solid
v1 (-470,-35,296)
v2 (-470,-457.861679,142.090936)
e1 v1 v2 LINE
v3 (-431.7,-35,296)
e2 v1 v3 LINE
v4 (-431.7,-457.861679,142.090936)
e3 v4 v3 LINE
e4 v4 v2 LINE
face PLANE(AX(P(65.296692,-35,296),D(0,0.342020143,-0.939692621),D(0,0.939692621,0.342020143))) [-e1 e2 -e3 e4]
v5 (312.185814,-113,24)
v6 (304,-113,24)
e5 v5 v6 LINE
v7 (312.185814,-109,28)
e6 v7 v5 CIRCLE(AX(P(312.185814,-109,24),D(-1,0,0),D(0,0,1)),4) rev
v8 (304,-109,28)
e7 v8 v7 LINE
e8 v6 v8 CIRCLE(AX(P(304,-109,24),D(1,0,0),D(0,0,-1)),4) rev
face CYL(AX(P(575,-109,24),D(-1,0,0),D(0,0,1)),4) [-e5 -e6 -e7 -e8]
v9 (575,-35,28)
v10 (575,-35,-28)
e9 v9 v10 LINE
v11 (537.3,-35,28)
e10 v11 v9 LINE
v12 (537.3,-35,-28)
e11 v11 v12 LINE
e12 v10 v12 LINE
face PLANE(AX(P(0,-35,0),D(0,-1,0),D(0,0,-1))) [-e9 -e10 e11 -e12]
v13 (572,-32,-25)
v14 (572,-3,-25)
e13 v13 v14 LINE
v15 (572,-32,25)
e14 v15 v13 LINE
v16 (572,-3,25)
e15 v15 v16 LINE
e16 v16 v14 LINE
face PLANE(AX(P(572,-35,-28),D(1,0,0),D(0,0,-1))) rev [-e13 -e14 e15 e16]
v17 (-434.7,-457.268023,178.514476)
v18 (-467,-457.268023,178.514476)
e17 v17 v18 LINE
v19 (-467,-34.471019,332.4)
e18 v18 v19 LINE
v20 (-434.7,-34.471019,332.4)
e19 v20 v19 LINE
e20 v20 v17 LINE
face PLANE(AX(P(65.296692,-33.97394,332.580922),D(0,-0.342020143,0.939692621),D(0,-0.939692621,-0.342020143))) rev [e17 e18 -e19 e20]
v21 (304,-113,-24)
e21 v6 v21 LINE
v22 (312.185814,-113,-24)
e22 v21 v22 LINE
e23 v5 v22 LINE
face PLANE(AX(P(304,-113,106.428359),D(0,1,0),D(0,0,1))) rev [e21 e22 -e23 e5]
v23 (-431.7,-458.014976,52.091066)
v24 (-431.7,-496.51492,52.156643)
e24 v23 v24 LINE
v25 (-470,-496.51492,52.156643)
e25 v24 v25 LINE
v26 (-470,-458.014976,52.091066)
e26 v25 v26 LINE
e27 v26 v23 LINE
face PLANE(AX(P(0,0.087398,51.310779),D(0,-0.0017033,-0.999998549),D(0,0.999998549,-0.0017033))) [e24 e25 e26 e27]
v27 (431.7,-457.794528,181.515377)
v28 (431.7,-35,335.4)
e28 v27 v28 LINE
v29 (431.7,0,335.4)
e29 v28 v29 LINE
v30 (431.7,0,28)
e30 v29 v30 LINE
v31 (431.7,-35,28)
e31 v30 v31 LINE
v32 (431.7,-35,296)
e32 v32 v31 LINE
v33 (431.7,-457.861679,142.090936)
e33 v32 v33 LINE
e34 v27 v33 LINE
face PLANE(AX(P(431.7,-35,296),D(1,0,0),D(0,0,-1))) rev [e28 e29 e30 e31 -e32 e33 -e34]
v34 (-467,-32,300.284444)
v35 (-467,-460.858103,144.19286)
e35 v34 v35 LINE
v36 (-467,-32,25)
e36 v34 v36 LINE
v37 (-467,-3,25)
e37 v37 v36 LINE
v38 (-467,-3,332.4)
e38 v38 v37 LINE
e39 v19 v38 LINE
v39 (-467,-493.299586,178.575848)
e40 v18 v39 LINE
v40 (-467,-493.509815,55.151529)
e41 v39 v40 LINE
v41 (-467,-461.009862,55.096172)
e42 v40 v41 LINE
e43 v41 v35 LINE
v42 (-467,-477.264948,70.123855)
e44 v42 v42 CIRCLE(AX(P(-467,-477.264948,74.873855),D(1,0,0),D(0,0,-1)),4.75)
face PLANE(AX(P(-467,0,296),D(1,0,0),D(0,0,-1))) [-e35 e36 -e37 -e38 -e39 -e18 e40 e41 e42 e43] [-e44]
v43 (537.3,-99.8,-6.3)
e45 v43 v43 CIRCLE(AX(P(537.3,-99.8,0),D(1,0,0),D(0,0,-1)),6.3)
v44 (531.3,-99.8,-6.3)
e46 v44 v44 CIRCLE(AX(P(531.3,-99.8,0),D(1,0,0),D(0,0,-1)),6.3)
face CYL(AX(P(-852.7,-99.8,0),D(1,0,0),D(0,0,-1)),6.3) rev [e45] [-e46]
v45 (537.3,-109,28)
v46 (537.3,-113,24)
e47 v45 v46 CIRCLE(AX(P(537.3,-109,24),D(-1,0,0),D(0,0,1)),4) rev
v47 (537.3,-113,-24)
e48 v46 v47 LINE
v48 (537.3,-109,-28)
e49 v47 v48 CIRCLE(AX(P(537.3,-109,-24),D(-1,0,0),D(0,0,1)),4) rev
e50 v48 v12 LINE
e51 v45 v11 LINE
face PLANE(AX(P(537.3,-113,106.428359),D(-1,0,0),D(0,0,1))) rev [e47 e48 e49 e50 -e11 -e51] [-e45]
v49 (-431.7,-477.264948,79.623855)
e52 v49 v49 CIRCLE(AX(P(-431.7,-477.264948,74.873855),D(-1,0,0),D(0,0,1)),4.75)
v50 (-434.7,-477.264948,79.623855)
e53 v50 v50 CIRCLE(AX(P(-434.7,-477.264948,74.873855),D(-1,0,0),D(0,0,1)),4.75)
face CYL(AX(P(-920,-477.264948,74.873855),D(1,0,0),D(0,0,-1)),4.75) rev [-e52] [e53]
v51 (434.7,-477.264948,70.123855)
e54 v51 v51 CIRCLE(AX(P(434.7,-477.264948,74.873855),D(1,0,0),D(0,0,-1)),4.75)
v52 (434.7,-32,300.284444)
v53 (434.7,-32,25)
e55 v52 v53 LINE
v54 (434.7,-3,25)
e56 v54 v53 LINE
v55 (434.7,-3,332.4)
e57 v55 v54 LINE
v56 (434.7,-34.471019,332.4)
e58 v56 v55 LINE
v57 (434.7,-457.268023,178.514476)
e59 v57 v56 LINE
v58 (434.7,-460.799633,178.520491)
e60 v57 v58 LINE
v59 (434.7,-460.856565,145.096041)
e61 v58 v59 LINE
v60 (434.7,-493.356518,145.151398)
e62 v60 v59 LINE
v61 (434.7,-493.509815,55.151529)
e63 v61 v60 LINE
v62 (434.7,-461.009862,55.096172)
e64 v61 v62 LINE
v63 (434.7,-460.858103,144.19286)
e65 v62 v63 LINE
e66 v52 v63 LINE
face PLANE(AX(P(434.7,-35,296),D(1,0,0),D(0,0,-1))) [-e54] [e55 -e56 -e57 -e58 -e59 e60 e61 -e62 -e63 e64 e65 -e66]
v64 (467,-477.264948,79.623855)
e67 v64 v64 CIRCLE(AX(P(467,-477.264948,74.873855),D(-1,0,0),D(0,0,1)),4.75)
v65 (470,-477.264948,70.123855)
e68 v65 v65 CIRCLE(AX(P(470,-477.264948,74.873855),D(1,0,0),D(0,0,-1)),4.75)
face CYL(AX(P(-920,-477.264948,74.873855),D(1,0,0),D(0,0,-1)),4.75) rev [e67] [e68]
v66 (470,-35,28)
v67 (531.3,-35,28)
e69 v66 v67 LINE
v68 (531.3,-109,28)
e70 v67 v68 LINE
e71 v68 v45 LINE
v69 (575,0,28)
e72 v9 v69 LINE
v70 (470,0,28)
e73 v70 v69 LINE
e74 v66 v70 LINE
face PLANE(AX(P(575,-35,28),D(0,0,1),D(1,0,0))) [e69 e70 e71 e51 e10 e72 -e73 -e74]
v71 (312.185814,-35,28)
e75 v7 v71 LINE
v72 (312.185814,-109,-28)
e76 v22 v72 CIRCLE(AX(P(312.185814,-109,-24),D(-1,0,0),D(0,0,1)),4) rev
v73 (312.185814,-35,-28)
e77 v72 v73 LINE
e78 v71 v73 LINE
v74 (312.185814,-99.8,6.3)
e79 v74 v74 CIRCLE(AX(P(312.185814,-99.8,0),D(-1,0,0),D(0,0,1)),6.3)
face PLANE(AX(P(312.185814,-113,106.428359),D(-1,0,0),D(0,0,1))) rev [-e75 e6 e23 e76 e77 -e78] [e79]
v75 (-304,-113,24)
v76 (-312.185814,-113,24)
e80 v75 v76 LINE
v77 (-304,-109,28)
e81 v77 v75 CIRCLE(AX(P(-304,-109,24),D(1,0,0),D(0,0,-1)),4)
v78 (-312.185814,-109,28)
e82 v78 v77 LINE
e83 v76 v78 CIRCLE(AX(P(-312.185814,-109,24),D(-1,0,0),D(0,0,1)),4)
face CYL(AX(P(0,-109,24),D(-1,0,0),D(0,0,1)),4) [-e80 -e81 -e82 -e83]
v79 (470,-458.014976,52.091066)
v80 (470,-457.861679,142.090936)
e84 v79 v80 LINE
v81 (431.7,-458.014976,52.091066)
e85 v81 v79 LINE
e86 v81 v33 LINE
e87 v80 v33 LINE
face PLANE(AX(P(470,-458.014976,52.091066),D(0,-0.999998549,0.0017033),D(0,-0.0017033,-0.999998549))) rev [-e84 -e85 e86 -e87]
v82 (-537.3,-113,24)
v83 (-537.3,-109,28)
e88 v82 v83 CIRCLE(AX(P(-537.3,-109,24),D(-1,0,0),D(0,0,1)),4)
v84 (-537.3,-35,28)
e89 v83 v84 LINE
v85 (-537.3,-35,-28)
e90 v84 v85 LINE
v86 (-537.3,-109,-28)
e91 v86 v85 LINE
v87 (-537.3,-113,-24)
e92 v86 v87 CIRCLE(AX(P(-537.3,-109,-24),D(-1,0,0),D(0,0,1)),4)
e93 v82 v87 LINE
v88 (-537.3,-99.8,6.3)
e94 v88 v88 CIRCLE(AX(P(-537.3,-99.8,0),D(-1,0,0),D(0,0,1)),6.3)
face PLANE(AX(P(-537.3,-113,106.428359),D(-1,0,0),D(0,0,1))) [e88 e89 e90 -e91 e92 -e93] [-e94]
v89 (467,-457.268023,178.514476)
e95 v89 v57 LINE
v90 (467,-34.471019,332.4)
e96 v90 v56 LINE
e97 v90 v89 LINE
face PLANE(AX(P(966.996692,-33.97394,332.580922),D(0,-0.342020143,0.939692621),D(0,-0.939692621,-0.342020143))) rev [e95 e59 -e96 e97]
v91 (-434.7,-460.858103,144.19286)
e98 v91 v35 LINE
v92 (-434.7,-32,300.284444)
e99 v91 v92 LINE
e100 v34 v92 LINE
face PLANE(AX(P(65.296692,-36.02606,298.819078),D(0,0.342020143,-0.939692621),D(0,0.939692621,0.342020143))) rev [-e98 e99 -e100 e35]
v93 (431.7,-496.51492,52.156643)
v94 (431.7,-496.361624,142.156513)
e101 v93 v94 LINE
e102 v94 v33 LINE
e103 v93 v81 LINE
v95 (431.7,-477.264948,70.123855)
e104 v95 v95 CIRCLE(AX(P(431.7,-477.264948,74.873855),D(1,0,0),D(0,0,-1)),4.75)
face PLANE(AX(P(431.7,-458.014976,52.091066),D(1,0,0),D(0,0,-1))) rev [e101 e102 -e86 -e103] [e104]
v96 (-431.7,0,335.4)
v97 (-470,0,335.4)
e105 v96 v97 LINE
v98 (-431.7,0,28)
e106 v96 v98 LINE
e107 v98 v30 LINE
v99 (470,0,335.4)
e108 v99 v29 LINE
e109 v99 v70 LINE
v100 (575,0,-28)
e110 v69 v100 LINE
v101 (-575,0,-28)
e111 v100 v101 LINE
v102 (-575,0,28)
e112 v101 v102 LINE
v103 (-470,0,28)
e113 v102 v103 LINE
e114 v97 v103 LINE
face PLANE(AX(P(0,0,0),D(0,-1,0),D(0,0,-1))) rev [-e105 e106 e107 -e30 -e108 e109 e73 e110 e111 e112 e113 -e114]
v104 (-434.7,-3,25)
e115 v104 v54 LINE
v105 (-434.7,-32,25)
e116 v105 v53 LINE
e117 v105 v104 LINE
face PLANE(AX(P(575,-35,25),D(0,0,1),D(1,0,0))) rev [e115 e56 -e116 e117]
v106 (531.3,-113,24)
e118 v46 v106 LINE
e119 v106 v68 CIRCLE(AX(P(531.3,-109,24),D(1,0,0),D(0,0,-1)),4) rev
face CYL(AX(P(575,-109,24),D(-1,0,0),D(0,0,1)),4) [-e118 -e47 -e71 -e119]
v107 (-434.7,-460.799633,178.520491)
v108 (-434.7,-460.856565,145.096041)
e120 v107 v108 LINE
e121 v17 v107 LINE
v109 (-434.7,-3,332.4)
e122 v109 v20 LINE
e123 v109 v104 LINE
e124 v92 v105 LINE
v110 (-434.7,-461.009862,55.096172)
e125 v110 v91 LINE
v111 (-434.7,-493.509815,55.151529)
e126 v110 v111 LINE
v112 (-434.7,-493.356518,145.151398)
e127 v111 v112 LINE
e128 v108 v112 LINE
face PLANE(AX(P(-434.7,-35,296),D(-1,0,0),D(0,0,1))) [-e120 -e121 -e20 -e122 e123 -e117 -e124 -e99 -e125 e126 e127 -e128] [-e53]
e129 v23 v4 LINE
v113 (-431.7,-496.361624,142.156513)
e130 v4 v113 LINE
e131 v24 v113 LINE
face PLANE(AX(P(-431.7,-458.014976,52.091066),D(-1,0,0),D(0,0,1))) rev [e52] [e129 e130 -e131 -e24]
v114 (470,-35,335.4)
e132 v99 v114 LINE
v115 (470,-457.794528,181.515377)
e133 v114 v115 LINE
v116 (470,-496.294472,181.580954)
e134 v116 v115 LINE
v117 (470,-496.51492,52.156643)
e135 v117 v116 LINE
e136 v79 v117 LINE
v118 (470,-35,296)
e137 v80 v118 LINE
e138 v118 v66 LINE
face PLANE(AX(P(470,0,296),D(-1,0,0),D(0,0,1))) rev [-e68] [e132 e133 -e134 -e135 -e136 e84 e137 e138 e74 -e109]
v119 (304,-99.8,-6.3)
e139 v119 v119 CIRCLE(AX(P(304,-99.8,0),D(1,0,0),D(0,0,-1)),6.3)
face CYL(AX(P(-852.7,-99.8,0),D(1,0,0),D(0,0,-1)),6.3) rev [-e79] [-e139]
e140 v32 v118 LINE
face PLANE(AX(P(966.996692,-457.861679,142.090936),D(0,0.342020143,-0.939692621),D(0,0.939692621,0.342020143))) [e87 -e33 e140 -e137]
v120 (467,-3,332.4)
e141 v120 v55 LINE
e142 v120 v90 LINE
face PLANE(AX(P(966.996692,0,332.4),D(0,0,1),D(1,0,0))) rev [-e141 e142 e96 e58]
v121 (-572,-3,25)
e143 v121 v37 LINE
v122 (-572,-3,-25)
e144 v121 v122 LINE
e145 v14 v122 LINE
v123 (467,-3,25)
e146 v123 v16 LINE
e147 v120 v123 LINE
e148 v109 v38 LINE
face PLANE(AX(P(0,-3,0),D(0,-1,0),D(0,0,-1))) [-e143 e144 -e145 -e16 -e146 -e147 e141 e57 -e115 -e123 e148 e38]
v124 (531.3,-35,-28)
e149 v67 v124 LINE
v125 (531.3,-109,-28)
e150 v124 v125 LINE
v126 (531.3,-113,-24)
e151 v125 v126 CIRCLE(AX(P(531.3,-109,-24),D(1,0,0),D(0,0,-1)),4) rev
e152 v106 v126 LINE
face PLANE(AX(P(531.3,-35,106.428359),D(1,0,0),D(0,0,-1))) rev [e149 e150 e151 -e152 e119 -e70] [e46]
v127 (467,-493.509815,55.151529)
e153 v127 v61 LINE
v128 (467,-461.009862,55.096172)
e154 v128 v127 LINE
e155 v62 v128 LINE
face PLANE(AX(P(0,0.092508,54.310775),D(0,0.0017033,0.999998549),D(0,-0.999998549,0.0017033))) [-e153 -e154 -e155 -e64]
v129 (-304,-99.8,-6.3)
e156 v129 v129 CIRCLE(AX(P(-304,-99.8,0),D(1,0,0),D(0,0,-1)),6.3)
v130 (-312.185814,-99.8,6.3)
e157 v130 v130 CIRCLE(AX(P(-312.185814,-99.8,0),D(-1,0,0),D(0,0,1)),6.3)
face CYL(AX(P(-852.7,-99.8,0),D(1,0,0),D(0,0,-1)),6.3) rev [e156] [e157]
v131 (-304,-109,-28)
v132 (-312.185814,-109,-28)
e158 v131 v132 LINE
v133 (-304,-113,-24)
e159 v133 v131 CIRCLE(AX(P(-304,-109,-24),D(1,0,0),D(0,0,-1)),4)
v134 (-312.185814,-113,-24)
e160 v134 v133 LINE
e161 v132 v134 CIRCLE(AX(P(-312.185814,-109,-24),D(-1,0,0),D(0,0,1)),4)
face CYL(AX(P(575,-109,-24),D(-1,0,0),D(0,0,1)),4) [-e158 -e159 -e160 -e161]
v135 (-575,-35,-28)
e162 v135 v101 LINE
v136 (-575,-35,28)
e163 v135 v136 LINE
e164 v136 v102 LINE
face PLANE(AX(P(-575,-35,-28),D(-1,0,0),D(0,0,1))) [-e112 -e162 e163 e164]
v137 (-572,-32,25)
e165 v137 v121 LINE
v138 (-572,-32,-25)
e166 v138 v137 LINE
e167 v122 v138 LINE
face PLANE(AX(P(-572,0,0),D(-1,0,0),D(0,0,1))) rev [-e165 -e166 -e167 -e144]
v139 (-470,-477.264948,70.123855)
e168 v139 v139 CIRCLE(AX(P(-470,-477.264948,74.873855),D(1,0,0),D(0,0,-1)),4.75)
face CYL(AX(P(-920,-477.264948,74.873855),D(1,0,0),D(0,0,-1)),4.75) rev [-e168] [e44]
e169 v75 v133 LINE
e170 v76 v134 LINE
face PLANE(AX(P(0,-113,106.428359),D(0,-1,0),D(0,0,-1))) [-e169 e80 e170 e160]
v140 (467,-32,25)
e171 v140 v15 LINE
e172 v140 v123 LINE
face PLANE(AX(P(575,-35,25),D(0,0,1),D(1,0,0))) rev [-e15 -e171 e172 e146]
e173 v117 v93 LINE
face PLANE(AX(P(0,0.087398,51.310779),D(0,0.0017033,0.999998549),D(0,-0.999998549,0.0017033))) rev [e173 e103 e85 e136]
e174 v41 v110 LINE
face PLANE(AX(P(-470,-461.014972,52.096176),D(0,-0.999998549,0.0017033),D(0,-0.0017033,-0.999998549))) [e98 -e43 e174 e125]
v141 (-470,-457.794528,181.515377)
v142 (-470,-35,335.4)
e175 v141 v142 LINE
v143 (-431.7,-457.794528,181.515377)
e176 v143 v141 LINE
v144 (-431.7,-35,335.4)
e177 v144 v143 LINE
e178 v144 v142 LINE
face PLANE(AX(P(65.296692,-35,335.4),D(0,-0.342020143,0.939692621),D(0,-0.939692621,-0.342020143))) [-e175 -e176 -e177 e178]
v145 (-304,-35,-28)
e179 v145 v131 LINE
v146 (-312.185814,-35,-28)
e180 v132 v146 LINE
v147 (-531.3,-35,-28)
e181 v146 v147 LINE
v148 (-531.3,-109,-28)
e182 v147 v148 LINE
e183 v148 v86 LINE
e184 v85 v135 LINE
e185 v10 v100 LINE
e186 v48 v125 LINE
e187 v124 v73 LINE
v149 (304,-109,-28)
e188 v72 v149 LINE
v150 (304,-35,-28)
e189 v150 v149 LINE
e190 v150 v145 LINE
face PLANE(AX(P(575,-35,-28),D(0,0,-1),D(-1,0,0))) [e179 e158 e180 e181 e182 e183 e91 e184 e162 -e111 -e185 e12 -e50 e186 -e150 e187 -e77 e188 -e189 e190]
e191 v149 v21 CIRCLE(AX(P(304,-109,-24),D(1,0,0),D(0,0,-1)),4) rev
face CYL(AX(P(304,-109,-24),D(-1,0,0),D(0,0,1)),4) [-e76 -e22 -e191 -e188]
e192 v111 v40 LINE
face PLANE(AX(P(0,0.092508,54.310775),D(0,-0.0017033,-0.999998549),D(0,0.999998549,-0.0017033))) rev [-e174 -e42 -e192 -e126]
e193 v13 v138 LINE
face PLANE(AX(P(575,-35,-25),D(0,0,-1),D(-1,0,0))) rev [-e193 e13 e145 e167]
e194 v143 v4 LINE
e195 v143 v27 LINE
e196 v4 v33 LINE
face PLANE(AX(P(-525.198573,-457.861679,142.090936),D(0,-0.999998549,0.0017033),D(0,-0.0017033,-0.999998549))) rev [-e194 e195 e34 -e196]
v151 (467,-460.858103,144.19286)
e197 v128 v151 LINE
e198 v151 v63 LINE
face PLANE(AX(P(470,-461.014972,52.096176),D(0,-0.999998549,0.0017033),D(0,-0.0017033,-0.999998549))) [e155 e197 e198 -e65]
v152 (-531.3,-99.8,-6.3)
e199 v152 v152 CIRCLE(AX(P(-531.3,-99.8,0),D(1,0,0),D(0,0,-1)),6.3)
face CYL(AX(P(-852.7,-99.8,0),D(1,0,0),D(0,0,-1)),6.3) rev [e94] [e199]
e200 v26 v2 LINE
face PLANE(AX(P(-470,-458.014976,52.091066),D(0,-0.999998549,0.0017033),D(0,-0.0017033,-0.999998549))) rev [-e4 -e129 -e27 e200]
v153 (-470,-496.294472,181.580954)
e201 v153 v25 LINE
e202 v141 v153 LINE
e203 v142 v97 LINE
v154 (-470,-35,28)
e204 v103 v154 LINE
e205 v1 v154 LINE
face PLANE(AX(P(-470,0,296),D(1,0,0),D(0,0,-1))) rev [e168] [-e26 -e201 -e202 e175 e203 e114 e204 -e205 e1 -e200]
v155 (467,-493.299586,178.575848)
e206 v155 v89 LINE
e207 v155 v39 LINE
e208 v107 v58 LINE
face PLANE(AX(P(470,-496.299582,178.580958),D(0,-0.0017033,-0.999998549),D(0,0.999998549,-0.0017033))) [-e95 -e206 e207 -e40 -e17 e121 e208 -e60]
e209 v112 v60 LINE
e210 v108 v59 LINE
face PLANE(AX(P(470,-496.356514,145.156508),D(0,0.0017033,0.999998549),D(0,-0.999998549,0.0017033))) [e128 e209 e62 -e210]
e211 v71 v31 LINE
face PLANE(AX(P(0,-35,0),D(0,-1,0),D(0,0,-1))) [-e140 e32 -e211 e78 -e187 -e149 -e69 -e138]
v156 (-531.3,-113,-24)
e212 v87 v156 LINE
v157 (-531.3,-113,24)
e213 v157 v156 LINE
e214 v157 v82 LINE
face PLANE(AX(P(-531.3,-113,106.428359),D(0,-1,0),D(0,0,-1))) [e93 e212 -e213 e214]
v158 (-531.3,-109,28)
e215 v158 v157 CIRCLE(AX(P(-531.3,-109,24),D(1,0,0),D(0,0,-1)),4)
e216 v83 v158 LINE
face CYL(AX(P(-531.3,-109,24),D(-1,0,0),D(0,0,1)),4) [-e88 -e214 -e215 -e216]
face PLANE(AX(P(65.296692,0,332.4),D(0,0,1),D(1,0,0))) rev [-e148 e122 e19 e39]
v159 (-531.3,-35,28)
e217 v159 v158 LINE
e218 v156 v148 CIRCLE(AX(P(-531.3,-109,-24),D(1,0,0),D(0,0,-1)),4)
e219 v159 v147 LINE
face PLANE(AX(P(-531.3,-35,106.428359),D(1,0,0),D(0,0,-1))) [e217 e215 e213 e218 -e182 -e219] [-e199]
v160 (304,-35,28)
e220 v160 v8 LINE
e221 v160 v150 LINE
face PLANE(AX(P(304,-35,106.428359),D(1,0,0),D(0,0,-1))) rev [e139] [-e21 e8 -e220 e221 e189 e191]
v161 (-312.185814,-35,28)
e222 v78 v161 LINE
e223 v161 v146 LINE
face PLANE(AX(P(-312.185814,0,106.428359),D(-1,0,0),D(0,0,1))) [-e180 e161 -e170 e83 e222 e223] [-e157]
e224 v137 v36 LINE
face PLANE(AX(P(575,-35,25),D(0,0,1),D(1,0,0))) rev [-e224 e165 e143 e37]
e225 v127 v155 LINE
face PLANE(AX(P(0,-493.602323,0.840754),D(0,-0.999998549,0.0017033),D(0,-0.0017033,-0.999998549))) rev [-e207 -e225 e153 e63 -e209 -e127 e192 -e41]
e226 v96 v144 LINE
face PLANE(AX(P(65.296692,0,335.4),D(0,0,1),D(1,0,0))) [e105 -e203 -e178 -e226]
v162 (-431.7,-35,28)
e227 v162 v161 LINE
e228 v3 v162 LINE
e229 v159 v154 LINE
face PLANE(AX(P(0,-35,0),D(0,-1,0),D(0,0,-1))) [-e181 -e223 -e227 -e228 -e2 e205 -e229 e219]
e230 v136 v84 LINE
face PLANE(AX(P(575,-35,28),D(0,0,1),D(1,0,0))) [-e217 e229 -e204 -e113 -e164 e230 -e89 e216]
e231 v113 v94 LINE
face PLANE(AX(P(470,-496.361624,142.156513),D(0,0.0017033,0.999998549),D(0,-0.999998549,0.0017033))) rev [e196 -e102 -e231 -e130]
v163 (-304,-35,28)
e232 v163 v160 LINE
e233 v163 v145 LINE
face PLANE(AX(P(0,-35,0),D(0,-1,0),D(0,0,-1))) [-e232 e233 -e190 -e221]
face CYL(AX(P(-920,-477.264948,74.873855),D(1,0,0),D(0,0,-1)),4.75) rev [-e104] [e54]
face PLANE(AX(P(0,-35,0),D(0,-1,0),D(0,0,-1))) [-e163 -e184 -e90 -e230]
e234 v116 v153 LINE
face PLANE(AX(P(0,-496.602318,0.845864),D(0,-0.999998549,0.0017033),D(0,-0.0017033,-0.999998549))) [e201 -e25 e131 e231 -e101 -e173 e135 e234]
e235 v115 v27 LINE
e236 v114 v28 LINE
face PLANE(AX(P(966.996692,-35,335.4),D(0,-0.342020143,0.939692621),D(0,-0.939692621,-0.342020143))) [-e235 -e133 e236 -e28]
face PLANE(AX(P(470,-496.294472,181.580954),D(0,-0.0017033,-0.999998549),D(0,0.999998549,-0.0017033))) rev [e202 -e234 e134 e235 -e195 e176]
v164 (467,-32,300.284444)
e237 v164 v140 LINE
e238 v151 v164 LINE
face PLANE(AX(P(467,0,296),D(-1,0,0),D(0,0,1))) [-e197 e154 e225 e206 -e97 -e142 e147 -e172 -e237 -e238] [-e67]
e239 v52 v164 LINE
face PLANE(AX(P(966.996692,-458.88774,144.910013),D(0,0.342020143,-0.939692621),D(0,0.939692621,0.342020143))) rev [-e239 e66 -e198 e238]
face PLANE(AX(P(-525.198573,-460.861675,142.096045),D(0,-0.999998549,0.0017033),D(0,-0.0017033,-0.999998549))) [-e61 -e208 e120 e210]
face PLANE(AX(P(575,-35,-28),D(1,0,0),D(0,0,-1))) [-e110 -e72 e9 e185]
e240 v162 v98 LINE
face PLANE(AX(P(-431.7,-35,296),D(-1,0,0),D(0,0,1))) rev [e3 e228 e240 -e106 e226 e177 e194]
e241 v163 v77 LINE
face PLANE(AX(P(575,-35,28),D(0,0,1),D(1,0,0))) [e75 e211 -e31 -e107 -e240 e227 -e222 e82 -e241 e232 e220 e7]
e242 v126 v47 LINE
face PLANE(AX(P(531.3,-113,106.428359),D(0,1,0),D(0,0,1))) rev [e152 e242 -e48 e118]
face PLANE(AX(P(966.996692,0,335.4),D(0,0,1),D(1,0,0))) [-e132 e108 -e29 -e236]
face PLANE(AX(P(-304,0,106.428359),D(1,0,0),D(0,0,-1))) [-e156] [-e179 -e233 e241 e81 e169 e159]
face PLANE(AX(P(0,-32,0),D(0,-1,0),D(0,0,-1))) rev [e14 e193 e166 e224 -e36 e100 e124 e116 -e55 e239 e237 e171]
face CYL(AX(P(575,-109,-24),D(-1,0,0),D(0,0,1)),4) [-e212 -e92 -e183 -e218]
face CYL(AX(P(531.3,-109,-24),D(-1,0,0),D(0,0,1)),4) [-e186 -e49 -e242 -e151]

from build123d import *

# Parameters (mm, degrees)
SKETCH1_W            = 1150
SKETCH1_H            = 56
BOSS_EXTRUDE1_DEPTH  = 35
SKETCH2_W            = 38.3
SKETCH2_H            = 35
BOSS_EXTRUDE2_DEPTH  = 268
BOSS_EXTRUDE3_DEPTH  = 38.3
BOSS_EXTRUDE4_DEPTH  = 38.3
SKETCH5_W            = 38.3
SKETCH5_H            = 39.42449842
BOSS_EXTRUDE5_DEPTH  = 38.5
BOSS_EXTRUDE6_DEPTH  = 901.7
SKETCH8_W            = 38.3
SKETCH8_H            = 38.5
BOSS_EXTRUDE7_DEPTH  = 90
SHELL2_START         = -467
SHELL2_OUTLINE_W     = 29
SHELL2_OUTLINE_H     = 50
SHELL2_DEPTH         = 934
SHELL2_2_DEPTH       = 32.3
SHELL2_START_2       = 434.7
SHELL2_3_DEPTH       = 32.3
SHELL2_START_3       = -575
SHELL2_4_OUTLINE_W   = 29
SHELL2_4_OUTLINE_H   = 50
SHELL2_4_DEPTH       = 1147
SKETCH13_W           = 50
SKETCH13_H           = 29
BOSS_EXTRUDE8_DEPTH  = 3
SKETCH14_R           = 4.75
CUT_EXTRUDE1_DEPTH   = 1390
SKETCH15_W           = 8.185813993
SKETCH15_H           = 78
SKETCH15_W_2         = 6
BOSS_EXTRUDE10_DEPTH = 56
FILLET2_R            = 4
SKETCH16_R           = 6.3
CUT_EXTRUDE2_DEPTH   = 1390


# Read off the part's stored shape, not the designer's step: Shell2
with BuildPart() as part:
    # Sketch1 → Boss-Extrude1 (new body)
    with BuildSketch(Plane(origin=(0, 0, 0), x_dir=(1, 0, 0), z_dir=(0, 1, 0))):
        Rectangle(SKETCH1_W, SKETCH1_H)
    extrude(amount=-BOSS_EXTRUDE1_DEPTH)

    # Sketch2 → Boss-Extrude2 (add)
    with BuildSketch(Plane.XY.offset(28)):
        with Locations((-450.85, -17.5)):
            Rectangle(SKETCH2_W, SKETCH2_H)
        with Locations((450.85, -17.5)):
            Rectangle(SKETCH2_W, SKETCH2_H)
    extrude(amount=BOSS_EXTRUDE2_DEPTH)

    # Sketch3 → Boss-Extrude3 (add)
    with BuildSketch(Plane.ZY.offset(470)):
        Polygon((296, -35), (142.090935503, -457.861679354), (181.515376734, -457.794527623), (335.4, -35), (335.4, 0), (296, 0), align=None)
    extrude(amount=-BOSS_EXTRUDE3_DEPTH)

    # Sketch4 → Boss-Extrude4 (add)
    with BuildSketch(Plane.ZY.offset(-431.7)):
        Polygon((296, 0), (335.4, 0), (335.4, -35), (181.515376734, -457.794527623), (142.090935503, -457.861679354), (296, -35), align=None)
    extrude(amount=-BOSS_EXTRUDE4_DEPTH)

    # Sketch5 → Boss-Extrude5 (add)
    with BuildSketch(Plane(origin=(0, -458.102374067, 0.780286699), x_dir=(1, 0, 0), z_dir=(0, -0.9999985493842727, 0.0017032995480483616))):
        with Locations((450.85, 161.023103003)):
            Rectangle(SKETCH5_W, SKETCH5_H)
    extrude(amount=BOSS_EXTRUDE5_DEPTH)

    # Sketch6 → Boss-Extrude6 (add)
    with BuildSketch(Plane.ZY.offset(-431.7)):
        Polygon((142.090935503, -457.861679354), (181.515376734, -457.794527623), (181.580953767, -496.294471775), (142.156512536, -496.361623505), align=None)
    extrude(amount=BOSS_EXTRUDE6_DEPTH)

    # Sketch8 → Boss-Extrude7 (add)
    with BuildSketch(Plane(origin=(0, 0.240694713, 141.310648805), x_dir=(-1, 0, 0), z_dir=(0, -0.0017032995480483616, -0.9999985493842727))):
        with Locations((-450.85, -477.353038599)):
            Rectangle(SKETCH8_W, SKETCH8_H)
        with Locations((450.85, -477.353038599)):
            Rectangle(SKETCH8_W, SKETCH8_H)
    extrude(amount=BOSS_EXTRUDE7_DEPTH)

    # Shell2 outline → Shell2 (cut)
    with BuildSketch(Plane.YZ.offset(SHELL2_START)):
        Polygon((-493.356517958, 145.151398286), (-460.856565103, 145.09604105), (-460.79963317, 178.520490985), (-493.299586025, 178.57584822), align=None)
        with Locations((-17.5, 0)):
            Rectangle(SHELL2_OUTLINE_W, SHELL2_OUTLINE_H)
    extrude(amount=SHELL2_DEPTH, mode=Mode.SUBTRACT)

    # Shell2 2 outline → Shell2 2 (cut)
    with BuildSketch(Plane.YZ.offset(SHELL2_START)):
        Polygon((-460.79963317, 178.520490985), (-460.856565103, 145.09604105), (-493.356517958, 145.151398286), (-493.509814917, 55.151528841), (-461.009862062, 55.096171606), (-460.858103494, 144.192859625), (-32, 300.28444402), (-32, 25), (-3, 25), (-3, 332.4), (-34.471019058, 332.4), (-457.268022568, 178.514475585), align=None)
    extrude(amount=SHELL2_2_DEPTH, mode=Mode.SUBTRACT)

    # Shell2 3 outline → Shell2 3 (cut)
    with BuildSketch(Plane.YZ.offset(SHELL2_START_2)):
        Polygon((-460.79963317, 178.520490985), (-460.856565103, 145.09604105), (-493.356517958, 145.151398286), (-493.509814917, 55.151528841), (-461.009862062, 55.096171606), (-460.858103494, 144.192859625), (-32, 300.28444402), (-32, 25), (-3, 25), (-3, 332.4), (-34.471019058, 332.4), (-457.268022568, 178.514475585), align=None)
    extrude(amount=SHELL2_3_DEPTH, mode=Mode.SUBTRACT)

    # Shell2 4 outline → Shell2 4 (cut)
    with BuildSketch(Plane.YZ.offset(SHELL2_START_3)):
        with Locations((-17.5, 0)):
            Rectangle(SHELL2_4_OUTLINE_W, SHELL2_4_OUTLINE_H)
    extrude(amount=SHELL2_4_DEPTH, mode=Mode.SUBTRACT)

    # Sketch13 → Boss-Extrude8 (add)
    with BuildSketch(Plane.ZY.offset(575)):
        with Locations((0, -17.5)):
            Rectangle(SKETCH13_W, SKETCH13_H)
    extrude(amount=-BOSS_EXTRUDE8_DEPTH)

    # Sketch14 → Cut-Extrude1 (cut)
    with BuildSketch(Plane(origin=(470, 0, 0), x_dir=(0, 0, -1), z_dir=(1, 0, 0))):
        with Locations((-74.873854575, -477.264948389)):
            Circle(SKETCH14_R)
    extrude(amount=-CUT_EXTRUDE1_DEPTH, mode=Mode.SUBTRACT)

    # Sketch15 → Boss-Extrude10 (add)
    with BuildSketch(Plane(origin=(0, 0, -28), x_dir=(-1, 0, 0), z_dir=(0, 0, -1))):
        with Locations((308.092906997, -74)):
            Rectangle(SKETCH15_W, SKETCH15_H)
        with Locations((534.3, -74)):
            Rectangle(SKETCH15_W_2, SKETCH15_H)
        with Locations((-534.3, -74)):
            Rectangle(SKETCH15_W_2, SKETCH15_H)
        with Locations((-308.092906997, -74)):
            Rectangle(SKETCH15_W, SKETCH15_H)
    extrude(amount=-BOSS_EXTRUDE10_DEPTH)

    # Fillet2
    fillet2_edges = [part.edges().sort_by_distance(p)[0] for p in [
        (-308.092906997, -113, -28),
        (-308.092906997, -113, 28),
        (-534.3, -113, -28),
        (-534.3, -113, 28),
        (534.3, -113, -28),
        (534.3, -113, 28),
        (308.092906997, -113, -28),
        (308.092906997, -113, 28),
    ]]
    fillet(fillet2_edges, radius=FILLET2_R)

    # Sketch16 → Cut-Extrude2 (cut)
    with BuildSketch(Plane(origin=(537.3, 0, 0), x_dir=(0, 0, -1), z_dir=(1, 0, 0))):
        with Locations((0, -99.8)):
            Circle(SKETCH16_R)
    extrude(amount=-CUT_EXTRUDE2_DEPTH, mode=Mode.SUBTRACT)


solid = part.part
